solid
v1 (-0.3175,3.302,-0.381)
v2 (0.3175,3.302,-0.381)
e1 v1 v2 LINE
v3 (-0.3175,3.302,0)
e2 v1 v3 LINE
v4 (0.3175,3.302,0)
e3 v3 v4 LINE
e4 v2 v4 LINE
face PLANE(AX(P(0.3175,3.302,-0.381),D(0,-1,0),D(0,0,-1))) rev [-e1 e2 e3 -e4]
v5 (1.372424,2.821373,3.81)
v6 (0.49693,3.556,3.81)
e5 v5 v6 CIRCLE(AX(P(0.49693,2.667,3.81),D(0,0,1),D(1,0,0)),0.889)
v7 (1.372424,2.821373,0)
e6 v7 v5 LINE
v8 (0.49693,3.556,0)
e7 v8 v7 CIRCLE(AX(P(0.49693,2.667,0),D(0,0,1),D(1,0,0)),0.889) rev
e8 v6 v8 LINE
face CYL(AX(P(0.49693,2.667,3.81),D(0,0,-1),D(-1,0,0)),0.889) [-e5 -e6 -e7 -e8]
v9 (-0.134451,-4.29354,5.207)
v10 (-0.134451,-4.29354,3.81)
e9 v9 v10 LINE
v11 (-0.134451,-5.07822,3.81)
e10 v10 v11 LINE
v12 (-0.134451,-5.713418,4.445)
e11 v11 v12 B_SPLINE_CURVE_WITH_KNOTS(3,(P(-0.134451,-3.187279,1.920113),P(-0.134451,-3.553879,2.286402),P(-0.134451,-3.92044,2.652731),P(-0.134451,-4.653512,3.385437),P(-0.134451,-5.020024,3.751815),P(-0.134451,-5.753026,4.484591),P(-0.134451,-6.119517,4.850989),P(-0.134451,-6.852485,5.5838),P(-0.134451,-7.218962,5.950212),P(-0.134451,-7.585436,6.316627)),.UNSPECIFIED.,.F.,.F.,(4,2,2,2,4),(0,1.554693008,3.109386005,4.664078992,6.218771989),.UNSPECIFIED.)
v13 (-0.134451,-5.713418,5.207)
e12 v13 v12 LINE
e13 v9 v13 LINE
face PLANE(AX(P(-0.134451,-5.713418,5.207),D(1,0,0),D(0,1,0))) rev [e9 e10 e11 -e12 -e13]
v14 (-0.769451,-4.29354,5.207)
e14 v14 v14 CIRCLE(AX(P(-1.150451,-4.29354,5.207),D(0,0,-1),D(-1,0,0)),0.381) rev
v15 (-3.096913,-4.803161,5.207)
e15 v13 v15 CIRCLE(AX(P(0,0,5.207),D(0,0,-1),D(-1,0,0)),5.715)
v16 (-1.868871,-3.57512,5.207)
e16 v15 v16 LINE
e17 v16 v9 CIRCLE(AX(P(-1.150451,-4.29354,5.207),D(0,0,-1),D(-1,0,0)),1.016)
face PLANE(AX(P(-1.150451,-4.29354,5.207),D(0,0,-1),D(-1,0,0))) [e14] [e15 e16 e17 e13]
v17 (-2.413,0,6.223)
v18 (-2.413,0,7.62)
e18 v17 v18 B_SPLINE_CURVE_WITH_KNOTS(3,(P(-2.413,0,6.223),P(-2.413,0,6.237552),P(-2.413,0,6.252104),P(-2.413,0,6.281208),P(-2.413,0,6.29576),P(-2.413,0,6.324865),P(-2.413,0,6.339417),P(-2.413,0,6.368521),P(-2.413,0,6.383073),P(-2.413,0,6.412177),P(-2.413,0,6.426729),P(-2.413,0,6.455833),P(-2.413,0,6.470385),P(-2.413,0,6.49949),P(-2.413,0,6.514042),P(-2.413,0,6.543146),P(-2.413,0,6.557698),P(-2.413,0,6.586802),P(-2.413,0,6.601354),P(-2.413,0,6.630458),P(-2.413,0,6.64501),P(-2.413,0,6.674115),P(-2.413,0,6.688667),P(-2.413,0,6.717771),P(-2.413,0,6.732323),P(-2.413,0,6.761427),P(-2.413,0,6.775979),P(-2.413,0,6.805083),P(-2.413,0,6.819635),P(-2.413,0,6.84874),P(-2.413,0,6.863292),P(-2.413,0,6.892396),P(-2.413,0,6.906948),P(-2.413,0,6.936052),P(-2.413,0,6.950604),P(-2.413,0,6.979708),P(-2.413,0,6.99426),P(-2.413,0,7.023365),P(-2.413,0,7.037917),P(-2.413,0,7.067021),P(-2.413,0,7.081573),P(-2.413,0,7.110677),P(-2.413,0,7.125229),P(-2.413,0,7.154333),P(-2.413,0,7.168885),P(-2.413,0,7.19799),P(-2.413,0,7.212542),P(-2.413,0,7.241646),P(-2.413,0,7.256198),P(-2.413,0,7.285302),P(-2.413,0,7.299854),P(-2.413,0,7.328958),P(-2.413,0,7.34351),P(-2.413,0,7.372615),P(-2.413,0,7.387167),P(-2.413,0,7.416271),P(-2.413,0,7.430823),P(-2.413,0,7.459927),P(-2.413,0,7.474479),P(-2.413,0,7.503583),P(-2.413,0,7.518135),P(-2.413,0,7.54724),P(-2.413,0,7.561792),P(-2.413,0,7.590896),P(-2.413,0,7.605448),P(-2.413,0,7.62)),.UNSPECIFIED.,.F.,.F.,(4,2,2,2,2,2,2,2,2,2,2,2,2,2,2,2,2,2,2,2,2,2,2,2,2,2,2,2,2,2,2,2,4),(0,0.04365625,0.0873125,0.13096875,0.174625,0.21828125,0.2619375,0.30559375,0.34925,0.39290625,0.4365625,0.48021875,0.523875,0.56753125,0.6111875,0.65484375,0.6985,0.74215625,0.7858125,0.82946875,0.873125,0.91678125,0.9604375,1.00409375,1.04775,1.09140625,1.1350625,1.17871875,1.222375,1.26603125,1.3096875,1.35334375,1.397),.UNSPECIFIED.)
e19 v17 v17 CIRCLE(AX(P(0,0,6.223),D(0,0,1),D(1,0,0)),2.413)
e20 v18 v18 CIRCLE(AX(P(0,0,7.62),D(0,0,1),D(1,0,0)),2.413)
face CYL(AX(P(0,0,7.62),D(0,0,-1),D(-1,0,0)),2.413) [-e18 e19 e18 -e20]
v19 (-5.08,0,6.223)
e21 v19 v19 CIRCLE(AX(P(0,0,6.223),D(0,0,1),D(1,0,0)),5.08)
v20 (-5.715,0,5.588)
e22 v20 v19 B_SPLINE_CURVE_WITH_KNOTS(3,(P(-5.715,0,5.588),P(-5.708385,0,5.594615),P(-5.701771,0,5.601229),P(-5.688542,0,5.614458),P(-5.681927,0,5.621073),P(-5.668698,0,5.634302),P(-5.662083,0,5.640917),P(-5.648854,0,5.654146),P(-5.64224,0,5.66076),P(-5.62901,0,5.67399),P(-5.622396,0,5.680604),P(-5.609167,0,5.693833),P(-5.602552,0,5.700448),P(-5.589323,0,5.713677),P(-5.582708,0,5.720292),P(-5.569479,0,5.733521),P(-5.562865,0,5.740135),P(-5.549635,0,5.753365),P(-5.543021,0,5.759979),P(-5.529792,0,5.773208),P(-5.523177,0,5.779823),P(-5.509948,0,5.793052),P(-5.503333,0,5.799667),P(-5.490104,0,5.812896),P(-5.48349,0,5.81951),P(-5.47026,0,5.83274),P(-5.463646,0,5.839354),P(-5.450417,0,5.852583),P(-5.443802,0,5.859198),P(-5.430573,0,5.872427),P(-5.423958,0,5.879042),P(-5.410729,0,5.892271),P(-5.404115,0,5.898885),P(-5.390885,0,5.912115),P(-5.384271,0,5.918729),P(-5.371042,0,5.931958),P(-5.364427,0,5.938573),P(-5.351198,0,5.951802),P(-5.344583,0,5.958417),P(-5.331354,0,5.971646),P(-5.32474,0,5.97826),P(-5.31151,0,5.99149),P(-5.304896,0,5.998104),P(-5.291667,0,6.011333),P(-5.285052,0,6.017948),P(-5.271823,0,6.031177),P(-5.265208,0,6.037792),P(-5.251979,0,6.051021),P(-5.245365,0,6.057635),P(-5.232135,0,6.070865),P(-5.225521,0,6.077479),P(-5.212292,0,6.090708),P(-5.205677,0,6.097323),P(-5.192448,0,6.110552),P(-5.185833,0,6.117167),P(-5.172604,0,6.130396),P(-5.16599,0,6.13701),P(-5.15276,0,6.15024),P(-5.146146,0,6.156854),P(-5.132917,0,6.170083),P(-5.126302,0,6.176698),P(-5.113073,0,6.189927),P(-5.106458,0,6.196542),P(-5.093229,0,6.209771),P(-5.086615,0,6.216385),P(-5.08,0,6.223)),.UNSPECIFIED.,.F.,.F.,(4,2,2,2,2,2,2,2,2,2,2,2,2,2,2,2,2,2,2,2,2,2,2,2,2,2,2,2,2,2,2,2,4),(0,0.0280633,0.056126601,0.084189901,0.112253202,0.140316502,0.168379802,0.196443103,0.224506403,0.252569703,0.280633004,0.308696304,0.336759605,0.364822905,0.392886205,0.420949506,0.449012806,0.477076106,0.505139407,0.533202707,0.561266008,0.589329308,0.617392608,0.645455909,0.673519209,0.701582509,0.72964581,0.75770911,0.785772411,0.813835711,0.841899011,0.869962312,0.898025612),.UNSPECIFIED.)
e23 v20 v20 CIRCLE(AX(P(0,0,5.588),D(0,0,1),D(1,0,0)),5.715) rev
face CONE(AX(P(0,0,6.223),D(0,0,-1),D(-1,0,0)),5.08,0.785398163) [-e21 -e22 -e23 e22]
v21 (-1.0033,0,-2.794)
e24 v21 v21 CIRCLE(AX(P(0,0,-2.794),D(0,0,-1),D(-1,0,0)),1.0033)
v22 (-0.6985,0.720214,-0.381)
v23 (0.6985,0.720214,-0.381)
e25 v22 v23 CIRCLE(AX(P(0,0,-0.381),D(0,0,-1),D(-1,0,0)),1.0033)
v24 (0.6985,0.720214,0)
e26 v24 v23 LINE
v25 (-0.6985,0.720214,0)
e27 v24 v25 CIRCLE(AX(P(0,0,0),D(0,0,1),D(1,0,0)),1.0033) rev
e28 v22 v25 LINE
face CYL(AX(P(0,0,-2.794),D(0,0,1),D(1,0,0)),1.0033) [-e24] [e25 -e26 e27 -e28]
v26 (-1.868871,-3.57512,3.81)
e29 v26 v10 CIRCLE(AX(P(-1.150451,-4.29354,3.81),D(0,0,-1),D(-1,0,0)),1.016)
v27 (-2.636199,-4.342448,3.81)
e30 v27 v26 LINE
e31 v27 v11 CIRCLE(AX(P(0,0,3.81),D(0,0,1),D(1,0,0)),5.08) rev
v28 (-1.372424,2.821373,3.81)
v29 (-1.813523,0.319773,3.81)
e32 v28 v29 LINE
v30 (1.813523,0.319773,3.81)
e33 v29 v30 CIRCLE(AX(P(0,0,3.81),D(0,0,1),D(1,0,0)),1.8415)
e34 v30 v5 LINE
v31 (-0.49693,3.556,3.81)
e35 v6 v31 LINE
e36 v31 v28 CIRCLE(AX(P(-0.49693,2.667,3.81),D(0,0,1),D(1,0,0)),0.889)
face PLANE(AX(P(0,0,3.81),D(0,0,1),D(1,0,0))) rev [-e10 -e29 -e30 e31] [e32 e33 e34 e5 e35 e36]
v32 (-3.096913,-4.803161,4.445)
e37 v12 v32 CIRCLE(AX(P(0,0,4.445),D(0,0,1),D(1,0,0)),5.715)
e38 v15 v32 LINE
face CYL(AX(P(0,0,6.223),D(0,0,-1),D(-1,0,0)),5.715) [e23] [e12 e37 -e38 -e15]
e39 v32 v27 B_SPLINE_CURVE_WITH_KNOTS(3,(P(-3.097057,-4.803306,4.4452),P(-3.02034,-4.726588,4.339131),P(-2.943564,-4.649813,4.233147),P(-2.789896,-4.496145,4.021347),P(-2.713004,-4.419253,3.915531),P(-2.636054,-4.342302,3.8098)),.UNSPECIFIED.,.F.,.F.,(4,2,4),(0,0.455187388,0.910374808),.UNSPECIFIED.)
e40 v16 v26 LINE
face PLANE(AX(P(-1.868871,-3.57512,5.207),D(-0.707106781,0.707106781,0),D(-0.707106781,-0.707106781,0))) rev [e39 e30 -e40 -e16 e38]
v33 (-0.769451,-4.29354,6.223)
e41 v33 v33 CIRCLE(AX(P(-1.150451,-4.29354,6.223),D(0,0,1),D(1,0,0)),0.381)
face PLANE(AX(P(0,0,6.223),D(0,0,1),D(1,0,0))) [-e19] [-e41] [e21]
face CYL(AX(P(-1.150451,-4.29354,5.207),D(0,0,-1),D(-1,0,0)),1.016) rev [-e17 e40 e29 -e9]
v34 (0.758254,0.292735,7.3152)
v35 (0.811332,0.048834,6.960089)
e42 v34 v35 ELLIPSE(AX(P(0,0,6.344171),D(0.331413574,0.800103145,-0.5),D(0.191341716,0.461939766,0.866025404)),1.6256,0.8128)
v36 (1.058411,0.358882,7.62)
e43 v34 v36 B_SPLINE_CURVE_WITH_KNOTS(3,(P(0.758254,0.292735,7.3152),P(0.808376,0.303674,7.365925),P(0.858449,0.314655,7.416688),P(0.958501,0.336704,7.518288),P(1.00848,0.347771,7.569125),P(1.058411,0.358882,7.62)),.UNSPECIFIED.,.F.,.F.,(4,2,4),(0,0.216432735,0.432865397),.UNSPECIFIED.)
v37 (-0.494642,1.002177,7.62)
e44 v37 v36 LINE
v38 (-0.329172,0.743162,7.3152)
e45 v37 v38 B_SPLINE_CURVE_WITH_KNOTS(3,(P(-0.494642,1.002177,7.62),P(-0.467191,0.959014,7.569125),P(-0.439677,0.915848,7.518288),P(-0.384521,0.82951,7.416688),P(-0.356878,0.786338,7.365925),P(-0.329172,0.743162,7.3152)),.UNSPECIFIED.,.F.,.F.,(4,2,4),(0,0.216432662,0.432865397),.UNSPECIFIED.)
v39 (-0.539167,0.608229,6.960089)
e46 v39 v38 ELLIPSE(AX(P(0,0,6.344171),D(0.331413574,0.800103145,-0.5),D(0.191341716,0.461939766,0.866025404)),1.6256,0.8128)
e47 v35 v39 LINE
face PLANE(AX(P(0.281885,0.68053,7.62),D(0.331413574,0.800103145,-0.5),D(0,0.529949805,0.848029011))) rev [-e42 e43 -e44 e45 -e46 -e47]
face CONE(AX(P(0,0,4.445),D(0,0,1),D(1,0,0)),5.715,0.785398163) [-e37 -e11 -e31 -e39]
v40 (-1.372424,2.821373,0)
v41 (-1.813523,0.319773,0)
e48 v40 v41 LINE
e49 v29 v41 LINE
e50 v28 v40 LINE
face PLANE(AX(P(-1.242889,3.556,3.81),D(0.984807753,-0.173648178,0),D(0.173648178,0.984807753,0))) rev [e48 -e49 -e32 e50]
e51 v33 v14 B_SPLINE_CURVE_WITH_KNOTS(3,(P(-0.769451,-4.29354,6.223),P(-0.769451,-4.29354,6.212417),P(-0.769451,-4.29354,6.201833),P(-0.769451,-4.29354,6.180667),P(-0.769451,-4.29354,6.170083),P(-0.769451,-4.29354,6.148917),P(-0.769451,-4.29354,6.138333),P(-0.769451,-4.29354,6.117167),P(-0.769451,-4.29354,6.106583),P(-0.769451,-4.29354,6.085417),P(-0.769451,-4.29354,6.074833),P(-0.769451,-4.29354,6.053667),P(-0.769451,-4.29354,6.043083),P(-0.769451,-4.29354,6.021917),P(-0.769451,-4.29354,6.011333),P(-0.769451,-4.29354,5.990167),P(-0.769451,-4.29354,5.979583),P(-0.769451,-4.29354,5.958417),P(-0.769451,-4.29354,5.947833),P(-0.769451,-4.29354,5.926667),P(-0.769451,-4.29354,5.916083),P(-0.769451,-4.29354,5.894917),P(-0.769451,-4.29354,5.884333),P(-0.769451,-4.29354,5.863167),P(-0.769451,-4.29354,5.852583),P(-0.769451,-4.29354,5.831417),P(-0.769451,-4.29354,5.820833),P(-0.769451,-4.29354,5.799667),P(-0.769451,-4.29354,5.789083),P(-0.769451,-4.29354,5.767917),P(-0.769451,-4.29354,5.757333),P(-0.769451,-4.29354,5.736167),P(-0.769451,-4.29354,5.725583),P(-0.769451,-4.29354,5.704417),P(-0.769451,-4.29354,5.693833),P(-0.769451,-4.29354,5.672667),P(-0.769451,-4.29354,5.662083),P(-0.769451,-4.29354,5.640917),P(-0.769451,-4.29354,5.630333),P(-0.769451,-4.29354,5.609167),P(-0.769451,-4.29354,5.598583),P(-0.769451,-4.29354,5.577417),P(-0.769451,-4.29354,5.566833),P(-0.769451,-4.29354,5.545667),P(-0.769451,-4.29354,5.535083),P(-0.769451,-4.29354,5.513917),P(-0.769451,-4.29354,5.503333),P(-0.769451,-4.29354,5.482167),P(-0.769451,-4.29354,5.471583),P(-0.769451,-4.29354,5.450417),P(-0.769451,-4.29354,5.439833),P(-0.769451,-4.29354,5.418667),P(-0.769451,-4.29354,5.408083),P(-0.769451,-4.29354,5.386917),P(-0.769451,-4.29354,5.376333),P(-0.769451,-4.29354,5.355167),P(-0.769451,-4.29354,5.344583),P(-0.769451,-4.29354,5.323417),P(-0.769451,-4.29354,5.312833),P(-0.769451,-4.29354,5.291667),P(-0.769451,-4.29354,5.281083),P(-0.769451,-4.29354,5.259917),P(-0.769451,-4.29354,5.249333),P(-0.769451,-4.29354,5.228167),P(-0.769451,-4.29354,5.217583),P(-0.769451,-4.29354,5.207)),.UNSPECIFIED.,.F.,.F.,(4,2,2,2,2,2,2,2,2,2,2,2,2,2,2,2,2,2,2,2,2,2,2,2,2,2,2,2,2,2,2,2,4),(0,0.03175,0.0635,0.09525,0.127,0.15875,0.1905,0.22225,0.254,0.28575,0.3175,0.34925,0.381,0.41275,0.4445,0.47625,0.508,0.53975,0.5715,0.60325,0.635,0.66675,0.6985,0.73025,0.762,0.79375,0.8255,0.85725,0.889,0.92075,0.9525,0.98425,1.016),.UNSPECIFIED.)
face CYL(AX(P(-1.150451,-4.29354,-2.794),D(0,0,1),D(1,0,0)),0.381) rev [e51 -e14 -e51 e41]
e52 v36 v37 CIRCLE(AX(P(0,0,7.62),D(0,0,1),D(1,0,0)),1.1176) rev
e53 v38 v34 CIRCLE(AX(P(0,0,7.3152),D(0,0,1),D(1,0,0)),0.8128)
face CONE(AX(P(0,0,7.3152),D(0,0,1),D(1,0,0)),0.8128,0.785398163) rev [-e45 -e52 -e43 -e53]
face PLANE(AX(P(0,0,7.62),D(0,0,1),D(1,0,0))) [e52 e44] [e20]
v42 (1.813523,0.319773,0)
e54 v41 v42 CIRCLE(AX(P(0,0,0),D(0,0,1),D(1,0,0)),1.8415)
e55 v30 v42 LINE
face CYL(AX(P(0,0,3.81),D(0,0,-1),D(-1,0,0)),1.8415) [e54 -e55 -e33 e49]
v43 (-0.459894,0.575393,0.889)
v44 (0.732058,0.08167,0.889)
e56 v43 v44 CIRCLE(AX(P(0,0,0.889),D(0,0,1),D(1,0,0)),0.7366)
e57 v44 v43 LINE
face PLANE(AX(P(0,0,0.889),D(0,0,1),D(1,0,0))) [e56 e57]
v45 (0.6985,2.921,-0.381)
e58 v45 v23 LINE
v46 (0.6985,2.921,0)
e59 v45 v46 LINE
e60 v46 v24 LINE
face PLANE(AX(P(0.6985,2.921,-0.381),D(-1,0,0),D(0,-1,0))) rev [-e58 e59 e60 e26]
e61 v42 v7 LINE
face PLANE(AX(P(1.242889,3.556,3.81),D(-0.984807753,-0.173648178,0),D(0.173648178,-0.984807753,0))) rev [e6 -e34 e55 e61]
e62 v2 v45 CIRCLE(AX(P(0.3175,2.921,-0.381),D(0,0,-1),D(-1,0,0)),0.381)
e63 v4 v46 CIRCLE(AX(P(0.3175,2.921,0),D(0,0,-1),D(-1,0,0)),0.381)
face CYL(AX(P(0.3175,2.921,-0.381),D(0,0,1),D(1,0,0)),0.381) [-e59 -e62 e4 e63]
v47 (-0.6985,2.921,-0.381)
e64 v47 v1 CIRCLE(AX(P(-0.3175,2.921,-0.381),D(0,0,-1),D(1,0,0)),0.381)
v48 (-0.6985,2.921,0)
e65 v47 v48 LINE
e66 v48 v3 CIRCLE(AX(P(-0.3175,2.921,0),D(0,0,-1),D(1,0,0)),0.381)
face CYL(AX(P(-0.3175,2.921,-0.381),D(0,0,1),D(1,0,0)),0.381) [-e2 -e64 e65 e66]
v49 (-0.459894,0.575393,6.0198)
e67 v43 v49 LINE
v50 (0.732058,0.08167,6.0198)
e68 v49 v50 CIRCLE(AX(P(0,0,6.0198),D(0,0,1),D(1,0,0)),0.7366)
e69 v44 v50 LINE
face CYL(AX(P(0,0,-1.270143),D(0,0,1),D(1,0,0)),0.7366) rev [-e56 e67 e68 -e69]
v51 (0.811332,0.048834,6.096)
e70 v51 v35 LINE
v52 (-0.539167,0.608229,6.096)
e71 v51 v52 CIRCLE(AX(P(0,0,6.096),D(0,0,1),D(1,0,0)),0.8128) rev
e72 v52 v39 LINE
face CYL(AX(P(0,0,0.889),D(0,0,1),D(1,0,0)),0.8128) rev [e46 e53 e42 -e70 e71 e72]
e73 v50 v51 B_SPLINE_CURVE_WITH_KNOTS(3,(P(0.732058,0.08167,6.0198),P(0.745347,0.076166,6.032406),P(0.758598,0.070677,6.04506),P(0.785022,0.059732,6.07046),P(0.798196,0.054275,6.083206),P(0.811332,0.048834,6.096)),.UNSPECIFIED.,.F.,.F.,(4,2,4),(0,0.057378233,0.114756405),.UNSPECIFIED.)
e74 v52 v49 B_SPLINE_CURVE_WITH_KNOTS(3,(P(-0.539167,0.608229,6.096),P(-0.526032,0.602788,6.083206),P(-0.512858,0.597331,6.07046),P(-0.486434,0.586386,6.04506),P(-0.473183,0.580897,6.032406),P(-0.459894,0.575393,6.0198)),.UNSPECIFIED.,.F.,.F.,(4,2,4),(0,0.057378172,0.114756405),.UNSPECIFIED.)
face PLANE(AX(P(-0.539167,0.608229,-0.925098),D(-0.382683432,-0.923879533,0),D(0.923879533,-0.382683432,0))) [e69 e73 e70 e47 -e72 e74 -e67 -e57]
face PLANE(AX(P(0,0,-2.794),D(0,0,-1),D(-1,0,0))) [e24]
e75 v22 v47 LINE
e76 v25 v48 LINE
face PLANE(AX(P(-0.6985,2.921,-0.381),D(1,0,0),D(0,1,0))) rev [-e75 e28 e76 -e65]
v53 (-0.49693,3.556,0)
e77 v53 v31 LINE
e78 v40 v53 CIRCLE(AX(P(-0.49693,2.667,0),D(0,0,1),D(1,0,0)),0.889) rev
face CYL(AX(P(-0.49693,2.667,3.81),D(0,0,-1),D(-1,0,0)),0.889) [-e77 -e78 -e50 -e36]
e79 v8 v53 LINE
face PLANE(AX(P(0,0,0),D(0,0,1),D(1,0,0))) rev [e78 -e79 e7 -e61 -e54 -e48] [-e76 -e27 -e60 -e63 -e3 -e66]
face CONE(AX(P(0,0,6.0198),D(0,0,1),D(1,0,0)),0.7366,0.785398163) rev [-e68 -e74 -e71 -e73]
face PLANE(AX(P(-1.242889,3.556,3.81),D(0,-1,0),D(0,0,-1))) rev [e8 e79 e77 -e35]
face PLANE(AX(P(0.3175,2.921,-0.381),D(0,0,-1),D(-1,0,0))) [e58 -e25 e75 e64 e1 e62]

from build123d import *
from build123d.topology import SkipClean

# Parameters (mm, degrees)
EXTRUDE1_DEPTH               = 3.81
SKETCH8_R                    = 2.413
EXTRUDE8_DEPTH               = 3.81
SKETCH6_R                    = 5.715
EXTRUDE6_DEPTH               = 2.413
SKETCH4_R                    = 0.254
EXTRUDE4_DEPTH               = 6.731
SKETCH5_R                    = 1.0033
EXTRUDE5_DEPTH               = 2.794
FILLET2_R                    = 0.889
CHAMFER1_SIZE                = 0.635
SKETCH7_R                    = 0.381
EXTRUDE7_DEPTH               = 13.109035428
CHAMFER3_SIZE                = 0.635
EXTRUDE9_DEPTH               = 0.381
EXTRUDE10_DEPTH              = 1.397
EXTRUDE11_DEPTH              = 6.731
CIRPATTERN1_COUNT            = 8
EXTRUDE12_DEPTH              = 6.731
CHAMFER4_SIZE                = 0.381
CHAMFER4_SIZE2               = 0.659911358
EXTRUDE13_DEPTH              = 0.6604
CUT_REVOLVE1_ANGLE           = 130
CUT_REVOLVE1_OTHER_WAY_ANGLE = 90
BOSS_EXTRUDE1_DEPTH          = 6.071088642
CUT_EXTRUDE1_DEPTH           = 0.838688642
CHAMFER5_SIZE                = 0.1016
CHAMFER6_SIZE                = 0.3048


with BuildPart() as part:
    # Sketch1 → Extrude1 (new body)
    with BuildSketch(Plane.XY):
        with BuildLine():
            Line((-1.242889362, 3.556), (-1.813523477, 0.319773119))
            ThreePointArc((-1.813523477, 0.319773119), (0, -1.8415), (1.813523477, 0.319773119))
            Line((1.813523477, 0.319773119), (1.242889362, 3.556))
            Line((1.242889362, 3.556), (-1.242889362, 3.556))
        make_face()
    extrude(amount=EXTRUDE1_DEPTH)

    # Sketch8 → Extrude8 (add)
    with BuildSketch(Plane.XY.offset(3.81)):
        with Locations(Location((0, 0, 0), (0, 0, 129.743387424))):
            Circle(SKETCH8_R)
    extrude(amount=EXTRUDE8_DEPTH)

    # Sketch6 → Extrude6 (add)
    with BuildSketch(Plane.XY.offset(3.81)):
        Circle(SKETCH6_R)
    extrude(amount=EXTRUDE6_DEPTH)

    # Sketch4 → Extrude4 (cut)
    with BuildSketch(Plane.XY.offset(7.62)):
        Circle(SKETCH4_R)
    extrude(amount=-EXTRUDE4_DEPTH, mode=Mode.SUBTRACT)

    # Sketch5 → Extrude5 (add)
    with BuildSketch(Plane(origin=(0, 0, 0), x_dir=(-1, 0, 0), z_dir=(0, 0, -1))):
        with Locations(Location((0, 0, 0), (0, 0, 180))):
            Circle(SKETCH5_R)
    extrude(amount=EXTRUDE5_DEPTH)

    # Fillet2
    fillet2_edges = [part.edges().sort_by_distance(p)[0] for p in [
        (1.242889362, 3.556, 1.905),
        (-1.242889362, 3.556, 1.905),
    ]]
    fillet(fillet2_edges, radius=FILLET2_R)

    # Chamfer1
    chamfer1_edges = [part.edges().sort_by_distance(p)[0] for p in [
        (-5.715, 0, 3.81),
    ]]
    chamfer(chamfer1_edges, length=CHAMFER1_SIZE)

    # Sketch7 → Extrude7 (cut, through all)
    with BuildSketch(Plane.XY.offset(6.223)):
        with Locations((-1.150450655, -4.293540298)):
            Circle(SKETCH7_R)
    extrude(amount=-EXTRUDE7_DEPTH, mode=Mode.SUBTRACT)

    # Chamfer3
    chamfer3_edges = [part.edges().sort_by_distance(p)[0] for p in [
        (-5.715, 0, 6.223),
    ]]
    chamfer(chamfer3_edges, length=CHAMFER3_SIZE)

    # Sketch9 → Extrude9 (add)
    with BuildSketch(Plane(origin=(0, 0, 0), x_dir=(-1, 0, 0), z_dir=(0, 0, -1))):
        with BuildLine():
            Line((-0.3175, 3.302), (0.3175, 3.302))
            ThreePointArc((0.3175, 3.302), (0.586907684, 3.190407684), (0.6985, 2.921))
            Line((0.6985, 2.921), (0.6985, 0))
            Line((0.6985, 0), (-0.6985, 0))
            Line((-0.6985, 0), (-0.6985, 2.921))
            ThreePointArc((-0.6985, 2.921), (-0.586907684, 3.190407684), (-0.3175, 3.302))
        make_face()
    extrude(amount=EXTRUDE9_DEPTH)

    # Sketch11 → Extrude10 (cut)
    with BuildSketch(Plane(origin=(0, 0, 3.81), x_dir=(-1, 0, 0), z_dir=(0, 0, -1))):
        with BuildLine():
            Line((1.868871145, -3.575119808), (3.096912551, -4.803161214))
            Line((3.096912551, -4.803161214), (3.096912551, -5.713418243))
            Line((3.096912551, -5.713418243), (0.134450655, -5.713418243))
            Line((0.134450655, -5.713418243), (0.134450655, -4.293540298))
            ThreePointArc((0.134450655, -4.293540298), (0.761644288, -3.354878693), (1.868871145, -3.575119808))
        make_face()
    extrude(amount=-EXTRUDE10_DEPTH, mode=Mode.SUBTRACT)

    # Sketch17 → Extrude11 (cut)
    with BuildSketch(Plane.XY.offset(7.62)):
        with BuildLine():
            Line((0, 0), (0, 0.8128))
            ThreePointArc((0, 0.8128), (0.077181384, 0.80912723), (0.153665255, 0.798142111))
            ThreePointArc((0.153665255, 0.798142111), (0.281884616, 0.680529664), (0.455713955, 0.673029443))
            ThreePointArc((0.455713955, 0.673029443), (0.517563871, 0.626714831), (0.574736392, 0.574736392))
            Line((0.574736392, 0.574736392), (0, 0))
        make_face()
    extrude11 = extrude(amount=-EXTRUDE11_DEPTH, mode=Mode.SUBTRACT)

    # CirPattern1: Extrude11 ×8 about axis
    cirpattern1_axis = Axis((0, 0, 0), (0, 0, 1))
    for i in range(1, CIRPATTERN1_COUNT):
        add(extrude11.rotate(cirpattern1_axis, i * 360 / CIRPATTERN1_COUNT), mode=Mode.SUBTRACT)

    # Sketch18 → Extrude12 (add)
    with BuildSketch(Plane.XY.offset(7.62)):
        Polygon((-0.539167209, 0.608229037), (0.811331666, 0.048834087), (0.986294531, 0.471231809), (-0.364204343, 1.030626759), align=None)
    extrude(amount=-EXTRUDE12_DEPTH)

    # Chamfer4
    chamfer4_edges = [part.edges().sort_by_distance(p)[0] for p in [
        (0.136082229, 0.328531562, 7.62),
    ]]
    chamfer4_side = [part.faces().sort_by_distance(p)[0] for p in [
        (1.499116567, -1.802914954, 7.62),
    ]]
    chamfer(chamfer4_edges, length=CHAMFER4_SIZE, length2=CHAMFER4_SIZE2, reference=chamfer4_side[0])

    # Sketch19 → Extrude13 (cut)
    with SkipClean():  # the faces are left unmerged after this step: merging them gives an invalid solid
        with BuildSketch(Plane.XY.offset(7.62)):
            with BuildLine():
                Line((0.811331666, 0.048834087), (-0.539167209, 0.608229037))
                ThreePointArc((-0.539167209, 0.608229037), (-0.311045094, -0.750929284), (0.811331666, 0.048834087))
            make_face()
        extrude(amount=-EXTRUDE13_DEPTH, mode=Mode.SUBTRACT)

    # Sketch20 → Cut-Revolve1 (revolve, cut)
    with SkipClean():  # the faces are left unmerged after this step: merging them gives an invalid solid
        with BuildSketch(Plane(origin=(0, 0, 0), x_dir=(0, 0, -1), z_dir=(1, 0, 0))):
            Polygon((-6.9596, -0.8128), (-6.9596, 0), (-6.1468, 0), align=None)
        revolve(axis=Axis((0, 0, 7.389643883), (0, 0, -1)), revolution_arc=CUT_REVOLVE1_ANGLE, mode=Mode.SUBTRACT)

    # Sketch20 → Cut-Revolve1 other way (revolve, cut)
    with SkipClean():  # the faces are left unmerged after this step: merging them gives an invalid solid
        with BuildSketch(Plane(origin=(0, 0, 0), x_dir=(0, 0, -1), z_dir=(1, 0, 0))):
            Polygon((-6.9596, -0.8128), (-6.9596, 0), (-6.1468, 0), align=None)
        revolve(axis=Axis((0, 0, 7.389643883), (0, 0, 1)), revolution_arc=CUT_REVOLVE1_OTHER_WAY_ANGLE, mode=Mode.SUBTRACT)

    # Sketch21 → Boss-Extrude1 (add)
    with SkipClean():  # the faces are left unmerged after this step: merging them gives an invalid solid
        with BuildSketch(Plane.XY.offset(6.960088642)):
            with BuildLine():
                Line((-0.459893976, 0.575392988), (-0.539167209, 0.608229037))
                ThreePointArc((-0.539167209, 0.608229037), (-0.311045094, -0.750929284), (0.811331666, 0.048834087))
                Line((0.811331666, 0.048834087), (0.732058433, 0.081670135))
                ThreePointArc((0.732058433, 0.081670135), (-0.281884616, -0.680529664), (-0.459893976, 0.575392988))
            make_face()
        extrude(amount=-BOSS_EXTRUDE1_DEPTH)

    # Sketch22 → Cut-Extrude1 (cut)
    with SkipClean():  # the faces are left unmerged after this step: merging them gives an invalid solid
        with BuildSketch(Plane.XY.offset(6.960088642)):
            with BuildLine():
                Line((-0.459893976, 0.575392988), (-0.539167209, 0.608229037))
                ThreePointArc((-0.539167209, 0.608229037), (-0.311045094, -0.750929284), (0.811331666, 0.048834087))
                Line((0.811331666, 0.048834087), (0.732058433, 0.081670135))
                ThreePointArc((0.732058433, 0.081670135), (-0.281884616, -0.680529664), (-0.459893976, 0.575392988))
            make_face()
        extrude(amount=-CUT_EXTRUDE1_DEPTH, mode=Mode.SUBTRACT)

    # Chamfer5
    # the kernel refuses this chamfer: 0.1016 mm, written as the material it takes off along each edge
    with BuildSketch(Plane(origin=(0, 0, 6.1214), x_dir=(-0.3826834323650876, -0.9238795325112875, 0), z_dir=(0.9238795325112875, -0.3826834323650876, 0))) as chamfer5_piece_1_section:
        Polygon((0.7366 + CHAMFER5_SIZE, 0), (0.7366, CHAMFER5_SIZE), (0.7366, 0), align=None)
    chamfer5_piece_1 = revolve(axis=Axis((0, 0, 6.1214), (0, 0, -1)), revolution_arc=45, mode=Mode.PRIVATE)
    chamfer5_piece_1 = chamfer5_piece_1 & Plane(origin=(0, 0, 6.085965336), x_dir=(-0.6633454831704748, 0.74831328329606, 0), z_dir=(0, 0, 1)) * Cylinder(0.8128, 4, mode=Mode.PRIVATE)
    add(chamfer5_piece_1, mode=Mode.SUBTRACT)
    with BuildSketch(Plane(origin=(0, 0, 6.1214), x_dir=(0.3826834323650712, -0.9238795325112945, 0), z_dir=(0.9238795325112945, 0.3826834323650712, 0))) as chamfer5_piece_2_section:
        Polygon((0.7366 + CHAMFER5_SIZE, 0), (0.7366, CHAMFER5_SIZE), (0.7366, 0), align=None)
    chamfer5_piece_2 = revolve(axis=Axis((0, 0, 6.1214), (0, 0, -1)), revolution_arc=45, mode=Mode.PRIVATE)
    chamfer5_piece_2 = chamfer5_piece_2 & Plane(origin=(0, 0, 6.085965336), x_dir=(-0.6633454831704748, 0.74831328329606, 0), z_dir=(0, 0, 1)) * Cylinder(0.8128, 4, mode=Mode.PRIVATE)
    add(chamfer5_piece_2, mode=Mode.SUBTRACT)
    with BuildSketch(Plane(origin=(0, 0, 6.1214), x_dir=(-0.9238795325112938, -0.3826834323650728, 0), z_dir=(0.3826834323650728, -0.9238795325112938, 0))) as chamfer5_piece_3_section:
        Polygon((0.7366 + CHAMFER5_SIZE, 0), (0.7366, CHAMFER5_SIZE), (0.7366, 0), align=None)
    chamfer5_piece_3 = revolve(axis=Axis((0, 0, 6.1214), (0, 0, -1)), revolution_arc=45, mode=Mode.PRIVATE)
    chamfer5_piece_3 = chamfer5_piece_3 & Plane(origin=(0, 0, 6.085965336), x_dir=(-0.6633454831704748, 0.74831328329606, 0), z_dir=(0, 0, 1)) * Cylinder(0.8128, 4, mode=Mode.PRIVATE)
    add(chamfer5_piece_3, mode=Mode.SUBTRACT)
    with BuildSketch(Plane(origin=(0, 0, 6.1214), x_dir=(-0.9238795325112764, 0.3826834323651145, 0), z_dir=(-0.3826834323651145, -0.9238795325112764, 0))) as chamfer5_piece_4_section:
        Polygon((0.7366 + CHAMFER5_SIZE, 0), (0.7366, CHAMFER5_SIZE), (0.7366, 0), align=None)
    chamfer5_piece_4 = revolve(axis=Axis((0, 0, 6.1214), (0, 0, -1)), revolution_arc=49.190233443, mode=Mode.PRIVATE)
    chamfer5_piece_4 = chamfer5_piece_4 & Plane(origin=(0, 0, 6.085613455), x_dir=(-0.6633454831704748, 0.74831328329606, 0), z_dir=(0, 0, 1)) * Cylinder(0.8128, 4, mode=Mode.PRIVATE)
    chamfer5_piece_4 = split(chamfer5_piece_4, bisect_by=Plane(origin=(-0.544175649, 0.610303601, 6.085613455), z_dir=(-0.38268343236508656, -0.9238795325112882, 0)), keep=Keep.TOP, mode=Mode.PRIVATE)
    add(chamfer5_piece_4, mode=Mode.SUBTRACT)
    with BuildSketch(Plane(origin=(0, 0, 6.1214), x_dir=(0.9238795325112772, -0.3826834323651127, 0), z_dir=(0.3826834323651127, 0.9238795325112772, 0))) as chamfer5_piece_5_section:
        Polygon((0.7366 + CHAMFER5_SIZE, 0), (0.7366, CHAMFER5_SIZE), (0.7366, 0), align=None)
    chamfer5_piece_5 = revolve(axis=Axis((0, 0, 6.1214), (0, 0, -1)), revolution_arc=45, mode=Mode.PRIVATE)
    chamfer5_piece_5 = chamfer5_piece_5 & Plane(origin=(0, 0, 6.085965336), x_dir=(-0.6633454831704748, 0.74831328329606, 0), z_dir=(0, 0, 1)) * Cylinder(0.8128, 4, mode=Mode.PRIVATE)
    add(chamfer5_piece_5, mode=Mode.SUBTRACT)
    with BuildSketch(Plane(origin=(0, 0, 6.1214), x_dir=(0.8934479656215565, 0.44916670928142266, 0), z_dir=(-0.44916670928142266, 0.8934479656215565, 0))) as chamfer5_piece_6_section:
        Polygon((0.7366 + CHAMFER5_SIZE, 0), (0.7366, CHAMFER5_SIZE), (0.7366, 0), align=None)
    chamfer5_piece_6 = revolve(axis=Axis((0, 0, 6.1214), (0, 0, -1)), revolution_arc=49.190233443, mode=Mode.PRIVATE)
    chamfer5_piece_6 = chamfer5_piece_6 & Plane(origin=(0, 0, 6.085613455), x_dir=(-0.6633454831704748, 0.74831328329606, 0), z_dir=(0, 0, 1)) * Cylinder(0.8128, 4, mode=Mode.PRIVATE)
    chamfer5_piece_6 = split(chamfer5_piece_6, bisect_by=Plane(origin=(0.816340106, 0.046759523, 6.085613455), z_dir=(-0.38268343236508556, -0.9238795325112885, 0)), keep=Keep.TOP, mode=Mode.PRIVATE)
    add(chamfer5_piece_6, mode=Mode.SUBTRACT)

    # Chamfer6
    chamfer6_edges = [part.edges().sort_by_distance(p)[0] for p in [
        (-0.311045094, -0.750929284, 7.62),
    ]]
    chamfer(chamfer6_edges, length=CHAMFER6_SIZE)


solid = part.part
